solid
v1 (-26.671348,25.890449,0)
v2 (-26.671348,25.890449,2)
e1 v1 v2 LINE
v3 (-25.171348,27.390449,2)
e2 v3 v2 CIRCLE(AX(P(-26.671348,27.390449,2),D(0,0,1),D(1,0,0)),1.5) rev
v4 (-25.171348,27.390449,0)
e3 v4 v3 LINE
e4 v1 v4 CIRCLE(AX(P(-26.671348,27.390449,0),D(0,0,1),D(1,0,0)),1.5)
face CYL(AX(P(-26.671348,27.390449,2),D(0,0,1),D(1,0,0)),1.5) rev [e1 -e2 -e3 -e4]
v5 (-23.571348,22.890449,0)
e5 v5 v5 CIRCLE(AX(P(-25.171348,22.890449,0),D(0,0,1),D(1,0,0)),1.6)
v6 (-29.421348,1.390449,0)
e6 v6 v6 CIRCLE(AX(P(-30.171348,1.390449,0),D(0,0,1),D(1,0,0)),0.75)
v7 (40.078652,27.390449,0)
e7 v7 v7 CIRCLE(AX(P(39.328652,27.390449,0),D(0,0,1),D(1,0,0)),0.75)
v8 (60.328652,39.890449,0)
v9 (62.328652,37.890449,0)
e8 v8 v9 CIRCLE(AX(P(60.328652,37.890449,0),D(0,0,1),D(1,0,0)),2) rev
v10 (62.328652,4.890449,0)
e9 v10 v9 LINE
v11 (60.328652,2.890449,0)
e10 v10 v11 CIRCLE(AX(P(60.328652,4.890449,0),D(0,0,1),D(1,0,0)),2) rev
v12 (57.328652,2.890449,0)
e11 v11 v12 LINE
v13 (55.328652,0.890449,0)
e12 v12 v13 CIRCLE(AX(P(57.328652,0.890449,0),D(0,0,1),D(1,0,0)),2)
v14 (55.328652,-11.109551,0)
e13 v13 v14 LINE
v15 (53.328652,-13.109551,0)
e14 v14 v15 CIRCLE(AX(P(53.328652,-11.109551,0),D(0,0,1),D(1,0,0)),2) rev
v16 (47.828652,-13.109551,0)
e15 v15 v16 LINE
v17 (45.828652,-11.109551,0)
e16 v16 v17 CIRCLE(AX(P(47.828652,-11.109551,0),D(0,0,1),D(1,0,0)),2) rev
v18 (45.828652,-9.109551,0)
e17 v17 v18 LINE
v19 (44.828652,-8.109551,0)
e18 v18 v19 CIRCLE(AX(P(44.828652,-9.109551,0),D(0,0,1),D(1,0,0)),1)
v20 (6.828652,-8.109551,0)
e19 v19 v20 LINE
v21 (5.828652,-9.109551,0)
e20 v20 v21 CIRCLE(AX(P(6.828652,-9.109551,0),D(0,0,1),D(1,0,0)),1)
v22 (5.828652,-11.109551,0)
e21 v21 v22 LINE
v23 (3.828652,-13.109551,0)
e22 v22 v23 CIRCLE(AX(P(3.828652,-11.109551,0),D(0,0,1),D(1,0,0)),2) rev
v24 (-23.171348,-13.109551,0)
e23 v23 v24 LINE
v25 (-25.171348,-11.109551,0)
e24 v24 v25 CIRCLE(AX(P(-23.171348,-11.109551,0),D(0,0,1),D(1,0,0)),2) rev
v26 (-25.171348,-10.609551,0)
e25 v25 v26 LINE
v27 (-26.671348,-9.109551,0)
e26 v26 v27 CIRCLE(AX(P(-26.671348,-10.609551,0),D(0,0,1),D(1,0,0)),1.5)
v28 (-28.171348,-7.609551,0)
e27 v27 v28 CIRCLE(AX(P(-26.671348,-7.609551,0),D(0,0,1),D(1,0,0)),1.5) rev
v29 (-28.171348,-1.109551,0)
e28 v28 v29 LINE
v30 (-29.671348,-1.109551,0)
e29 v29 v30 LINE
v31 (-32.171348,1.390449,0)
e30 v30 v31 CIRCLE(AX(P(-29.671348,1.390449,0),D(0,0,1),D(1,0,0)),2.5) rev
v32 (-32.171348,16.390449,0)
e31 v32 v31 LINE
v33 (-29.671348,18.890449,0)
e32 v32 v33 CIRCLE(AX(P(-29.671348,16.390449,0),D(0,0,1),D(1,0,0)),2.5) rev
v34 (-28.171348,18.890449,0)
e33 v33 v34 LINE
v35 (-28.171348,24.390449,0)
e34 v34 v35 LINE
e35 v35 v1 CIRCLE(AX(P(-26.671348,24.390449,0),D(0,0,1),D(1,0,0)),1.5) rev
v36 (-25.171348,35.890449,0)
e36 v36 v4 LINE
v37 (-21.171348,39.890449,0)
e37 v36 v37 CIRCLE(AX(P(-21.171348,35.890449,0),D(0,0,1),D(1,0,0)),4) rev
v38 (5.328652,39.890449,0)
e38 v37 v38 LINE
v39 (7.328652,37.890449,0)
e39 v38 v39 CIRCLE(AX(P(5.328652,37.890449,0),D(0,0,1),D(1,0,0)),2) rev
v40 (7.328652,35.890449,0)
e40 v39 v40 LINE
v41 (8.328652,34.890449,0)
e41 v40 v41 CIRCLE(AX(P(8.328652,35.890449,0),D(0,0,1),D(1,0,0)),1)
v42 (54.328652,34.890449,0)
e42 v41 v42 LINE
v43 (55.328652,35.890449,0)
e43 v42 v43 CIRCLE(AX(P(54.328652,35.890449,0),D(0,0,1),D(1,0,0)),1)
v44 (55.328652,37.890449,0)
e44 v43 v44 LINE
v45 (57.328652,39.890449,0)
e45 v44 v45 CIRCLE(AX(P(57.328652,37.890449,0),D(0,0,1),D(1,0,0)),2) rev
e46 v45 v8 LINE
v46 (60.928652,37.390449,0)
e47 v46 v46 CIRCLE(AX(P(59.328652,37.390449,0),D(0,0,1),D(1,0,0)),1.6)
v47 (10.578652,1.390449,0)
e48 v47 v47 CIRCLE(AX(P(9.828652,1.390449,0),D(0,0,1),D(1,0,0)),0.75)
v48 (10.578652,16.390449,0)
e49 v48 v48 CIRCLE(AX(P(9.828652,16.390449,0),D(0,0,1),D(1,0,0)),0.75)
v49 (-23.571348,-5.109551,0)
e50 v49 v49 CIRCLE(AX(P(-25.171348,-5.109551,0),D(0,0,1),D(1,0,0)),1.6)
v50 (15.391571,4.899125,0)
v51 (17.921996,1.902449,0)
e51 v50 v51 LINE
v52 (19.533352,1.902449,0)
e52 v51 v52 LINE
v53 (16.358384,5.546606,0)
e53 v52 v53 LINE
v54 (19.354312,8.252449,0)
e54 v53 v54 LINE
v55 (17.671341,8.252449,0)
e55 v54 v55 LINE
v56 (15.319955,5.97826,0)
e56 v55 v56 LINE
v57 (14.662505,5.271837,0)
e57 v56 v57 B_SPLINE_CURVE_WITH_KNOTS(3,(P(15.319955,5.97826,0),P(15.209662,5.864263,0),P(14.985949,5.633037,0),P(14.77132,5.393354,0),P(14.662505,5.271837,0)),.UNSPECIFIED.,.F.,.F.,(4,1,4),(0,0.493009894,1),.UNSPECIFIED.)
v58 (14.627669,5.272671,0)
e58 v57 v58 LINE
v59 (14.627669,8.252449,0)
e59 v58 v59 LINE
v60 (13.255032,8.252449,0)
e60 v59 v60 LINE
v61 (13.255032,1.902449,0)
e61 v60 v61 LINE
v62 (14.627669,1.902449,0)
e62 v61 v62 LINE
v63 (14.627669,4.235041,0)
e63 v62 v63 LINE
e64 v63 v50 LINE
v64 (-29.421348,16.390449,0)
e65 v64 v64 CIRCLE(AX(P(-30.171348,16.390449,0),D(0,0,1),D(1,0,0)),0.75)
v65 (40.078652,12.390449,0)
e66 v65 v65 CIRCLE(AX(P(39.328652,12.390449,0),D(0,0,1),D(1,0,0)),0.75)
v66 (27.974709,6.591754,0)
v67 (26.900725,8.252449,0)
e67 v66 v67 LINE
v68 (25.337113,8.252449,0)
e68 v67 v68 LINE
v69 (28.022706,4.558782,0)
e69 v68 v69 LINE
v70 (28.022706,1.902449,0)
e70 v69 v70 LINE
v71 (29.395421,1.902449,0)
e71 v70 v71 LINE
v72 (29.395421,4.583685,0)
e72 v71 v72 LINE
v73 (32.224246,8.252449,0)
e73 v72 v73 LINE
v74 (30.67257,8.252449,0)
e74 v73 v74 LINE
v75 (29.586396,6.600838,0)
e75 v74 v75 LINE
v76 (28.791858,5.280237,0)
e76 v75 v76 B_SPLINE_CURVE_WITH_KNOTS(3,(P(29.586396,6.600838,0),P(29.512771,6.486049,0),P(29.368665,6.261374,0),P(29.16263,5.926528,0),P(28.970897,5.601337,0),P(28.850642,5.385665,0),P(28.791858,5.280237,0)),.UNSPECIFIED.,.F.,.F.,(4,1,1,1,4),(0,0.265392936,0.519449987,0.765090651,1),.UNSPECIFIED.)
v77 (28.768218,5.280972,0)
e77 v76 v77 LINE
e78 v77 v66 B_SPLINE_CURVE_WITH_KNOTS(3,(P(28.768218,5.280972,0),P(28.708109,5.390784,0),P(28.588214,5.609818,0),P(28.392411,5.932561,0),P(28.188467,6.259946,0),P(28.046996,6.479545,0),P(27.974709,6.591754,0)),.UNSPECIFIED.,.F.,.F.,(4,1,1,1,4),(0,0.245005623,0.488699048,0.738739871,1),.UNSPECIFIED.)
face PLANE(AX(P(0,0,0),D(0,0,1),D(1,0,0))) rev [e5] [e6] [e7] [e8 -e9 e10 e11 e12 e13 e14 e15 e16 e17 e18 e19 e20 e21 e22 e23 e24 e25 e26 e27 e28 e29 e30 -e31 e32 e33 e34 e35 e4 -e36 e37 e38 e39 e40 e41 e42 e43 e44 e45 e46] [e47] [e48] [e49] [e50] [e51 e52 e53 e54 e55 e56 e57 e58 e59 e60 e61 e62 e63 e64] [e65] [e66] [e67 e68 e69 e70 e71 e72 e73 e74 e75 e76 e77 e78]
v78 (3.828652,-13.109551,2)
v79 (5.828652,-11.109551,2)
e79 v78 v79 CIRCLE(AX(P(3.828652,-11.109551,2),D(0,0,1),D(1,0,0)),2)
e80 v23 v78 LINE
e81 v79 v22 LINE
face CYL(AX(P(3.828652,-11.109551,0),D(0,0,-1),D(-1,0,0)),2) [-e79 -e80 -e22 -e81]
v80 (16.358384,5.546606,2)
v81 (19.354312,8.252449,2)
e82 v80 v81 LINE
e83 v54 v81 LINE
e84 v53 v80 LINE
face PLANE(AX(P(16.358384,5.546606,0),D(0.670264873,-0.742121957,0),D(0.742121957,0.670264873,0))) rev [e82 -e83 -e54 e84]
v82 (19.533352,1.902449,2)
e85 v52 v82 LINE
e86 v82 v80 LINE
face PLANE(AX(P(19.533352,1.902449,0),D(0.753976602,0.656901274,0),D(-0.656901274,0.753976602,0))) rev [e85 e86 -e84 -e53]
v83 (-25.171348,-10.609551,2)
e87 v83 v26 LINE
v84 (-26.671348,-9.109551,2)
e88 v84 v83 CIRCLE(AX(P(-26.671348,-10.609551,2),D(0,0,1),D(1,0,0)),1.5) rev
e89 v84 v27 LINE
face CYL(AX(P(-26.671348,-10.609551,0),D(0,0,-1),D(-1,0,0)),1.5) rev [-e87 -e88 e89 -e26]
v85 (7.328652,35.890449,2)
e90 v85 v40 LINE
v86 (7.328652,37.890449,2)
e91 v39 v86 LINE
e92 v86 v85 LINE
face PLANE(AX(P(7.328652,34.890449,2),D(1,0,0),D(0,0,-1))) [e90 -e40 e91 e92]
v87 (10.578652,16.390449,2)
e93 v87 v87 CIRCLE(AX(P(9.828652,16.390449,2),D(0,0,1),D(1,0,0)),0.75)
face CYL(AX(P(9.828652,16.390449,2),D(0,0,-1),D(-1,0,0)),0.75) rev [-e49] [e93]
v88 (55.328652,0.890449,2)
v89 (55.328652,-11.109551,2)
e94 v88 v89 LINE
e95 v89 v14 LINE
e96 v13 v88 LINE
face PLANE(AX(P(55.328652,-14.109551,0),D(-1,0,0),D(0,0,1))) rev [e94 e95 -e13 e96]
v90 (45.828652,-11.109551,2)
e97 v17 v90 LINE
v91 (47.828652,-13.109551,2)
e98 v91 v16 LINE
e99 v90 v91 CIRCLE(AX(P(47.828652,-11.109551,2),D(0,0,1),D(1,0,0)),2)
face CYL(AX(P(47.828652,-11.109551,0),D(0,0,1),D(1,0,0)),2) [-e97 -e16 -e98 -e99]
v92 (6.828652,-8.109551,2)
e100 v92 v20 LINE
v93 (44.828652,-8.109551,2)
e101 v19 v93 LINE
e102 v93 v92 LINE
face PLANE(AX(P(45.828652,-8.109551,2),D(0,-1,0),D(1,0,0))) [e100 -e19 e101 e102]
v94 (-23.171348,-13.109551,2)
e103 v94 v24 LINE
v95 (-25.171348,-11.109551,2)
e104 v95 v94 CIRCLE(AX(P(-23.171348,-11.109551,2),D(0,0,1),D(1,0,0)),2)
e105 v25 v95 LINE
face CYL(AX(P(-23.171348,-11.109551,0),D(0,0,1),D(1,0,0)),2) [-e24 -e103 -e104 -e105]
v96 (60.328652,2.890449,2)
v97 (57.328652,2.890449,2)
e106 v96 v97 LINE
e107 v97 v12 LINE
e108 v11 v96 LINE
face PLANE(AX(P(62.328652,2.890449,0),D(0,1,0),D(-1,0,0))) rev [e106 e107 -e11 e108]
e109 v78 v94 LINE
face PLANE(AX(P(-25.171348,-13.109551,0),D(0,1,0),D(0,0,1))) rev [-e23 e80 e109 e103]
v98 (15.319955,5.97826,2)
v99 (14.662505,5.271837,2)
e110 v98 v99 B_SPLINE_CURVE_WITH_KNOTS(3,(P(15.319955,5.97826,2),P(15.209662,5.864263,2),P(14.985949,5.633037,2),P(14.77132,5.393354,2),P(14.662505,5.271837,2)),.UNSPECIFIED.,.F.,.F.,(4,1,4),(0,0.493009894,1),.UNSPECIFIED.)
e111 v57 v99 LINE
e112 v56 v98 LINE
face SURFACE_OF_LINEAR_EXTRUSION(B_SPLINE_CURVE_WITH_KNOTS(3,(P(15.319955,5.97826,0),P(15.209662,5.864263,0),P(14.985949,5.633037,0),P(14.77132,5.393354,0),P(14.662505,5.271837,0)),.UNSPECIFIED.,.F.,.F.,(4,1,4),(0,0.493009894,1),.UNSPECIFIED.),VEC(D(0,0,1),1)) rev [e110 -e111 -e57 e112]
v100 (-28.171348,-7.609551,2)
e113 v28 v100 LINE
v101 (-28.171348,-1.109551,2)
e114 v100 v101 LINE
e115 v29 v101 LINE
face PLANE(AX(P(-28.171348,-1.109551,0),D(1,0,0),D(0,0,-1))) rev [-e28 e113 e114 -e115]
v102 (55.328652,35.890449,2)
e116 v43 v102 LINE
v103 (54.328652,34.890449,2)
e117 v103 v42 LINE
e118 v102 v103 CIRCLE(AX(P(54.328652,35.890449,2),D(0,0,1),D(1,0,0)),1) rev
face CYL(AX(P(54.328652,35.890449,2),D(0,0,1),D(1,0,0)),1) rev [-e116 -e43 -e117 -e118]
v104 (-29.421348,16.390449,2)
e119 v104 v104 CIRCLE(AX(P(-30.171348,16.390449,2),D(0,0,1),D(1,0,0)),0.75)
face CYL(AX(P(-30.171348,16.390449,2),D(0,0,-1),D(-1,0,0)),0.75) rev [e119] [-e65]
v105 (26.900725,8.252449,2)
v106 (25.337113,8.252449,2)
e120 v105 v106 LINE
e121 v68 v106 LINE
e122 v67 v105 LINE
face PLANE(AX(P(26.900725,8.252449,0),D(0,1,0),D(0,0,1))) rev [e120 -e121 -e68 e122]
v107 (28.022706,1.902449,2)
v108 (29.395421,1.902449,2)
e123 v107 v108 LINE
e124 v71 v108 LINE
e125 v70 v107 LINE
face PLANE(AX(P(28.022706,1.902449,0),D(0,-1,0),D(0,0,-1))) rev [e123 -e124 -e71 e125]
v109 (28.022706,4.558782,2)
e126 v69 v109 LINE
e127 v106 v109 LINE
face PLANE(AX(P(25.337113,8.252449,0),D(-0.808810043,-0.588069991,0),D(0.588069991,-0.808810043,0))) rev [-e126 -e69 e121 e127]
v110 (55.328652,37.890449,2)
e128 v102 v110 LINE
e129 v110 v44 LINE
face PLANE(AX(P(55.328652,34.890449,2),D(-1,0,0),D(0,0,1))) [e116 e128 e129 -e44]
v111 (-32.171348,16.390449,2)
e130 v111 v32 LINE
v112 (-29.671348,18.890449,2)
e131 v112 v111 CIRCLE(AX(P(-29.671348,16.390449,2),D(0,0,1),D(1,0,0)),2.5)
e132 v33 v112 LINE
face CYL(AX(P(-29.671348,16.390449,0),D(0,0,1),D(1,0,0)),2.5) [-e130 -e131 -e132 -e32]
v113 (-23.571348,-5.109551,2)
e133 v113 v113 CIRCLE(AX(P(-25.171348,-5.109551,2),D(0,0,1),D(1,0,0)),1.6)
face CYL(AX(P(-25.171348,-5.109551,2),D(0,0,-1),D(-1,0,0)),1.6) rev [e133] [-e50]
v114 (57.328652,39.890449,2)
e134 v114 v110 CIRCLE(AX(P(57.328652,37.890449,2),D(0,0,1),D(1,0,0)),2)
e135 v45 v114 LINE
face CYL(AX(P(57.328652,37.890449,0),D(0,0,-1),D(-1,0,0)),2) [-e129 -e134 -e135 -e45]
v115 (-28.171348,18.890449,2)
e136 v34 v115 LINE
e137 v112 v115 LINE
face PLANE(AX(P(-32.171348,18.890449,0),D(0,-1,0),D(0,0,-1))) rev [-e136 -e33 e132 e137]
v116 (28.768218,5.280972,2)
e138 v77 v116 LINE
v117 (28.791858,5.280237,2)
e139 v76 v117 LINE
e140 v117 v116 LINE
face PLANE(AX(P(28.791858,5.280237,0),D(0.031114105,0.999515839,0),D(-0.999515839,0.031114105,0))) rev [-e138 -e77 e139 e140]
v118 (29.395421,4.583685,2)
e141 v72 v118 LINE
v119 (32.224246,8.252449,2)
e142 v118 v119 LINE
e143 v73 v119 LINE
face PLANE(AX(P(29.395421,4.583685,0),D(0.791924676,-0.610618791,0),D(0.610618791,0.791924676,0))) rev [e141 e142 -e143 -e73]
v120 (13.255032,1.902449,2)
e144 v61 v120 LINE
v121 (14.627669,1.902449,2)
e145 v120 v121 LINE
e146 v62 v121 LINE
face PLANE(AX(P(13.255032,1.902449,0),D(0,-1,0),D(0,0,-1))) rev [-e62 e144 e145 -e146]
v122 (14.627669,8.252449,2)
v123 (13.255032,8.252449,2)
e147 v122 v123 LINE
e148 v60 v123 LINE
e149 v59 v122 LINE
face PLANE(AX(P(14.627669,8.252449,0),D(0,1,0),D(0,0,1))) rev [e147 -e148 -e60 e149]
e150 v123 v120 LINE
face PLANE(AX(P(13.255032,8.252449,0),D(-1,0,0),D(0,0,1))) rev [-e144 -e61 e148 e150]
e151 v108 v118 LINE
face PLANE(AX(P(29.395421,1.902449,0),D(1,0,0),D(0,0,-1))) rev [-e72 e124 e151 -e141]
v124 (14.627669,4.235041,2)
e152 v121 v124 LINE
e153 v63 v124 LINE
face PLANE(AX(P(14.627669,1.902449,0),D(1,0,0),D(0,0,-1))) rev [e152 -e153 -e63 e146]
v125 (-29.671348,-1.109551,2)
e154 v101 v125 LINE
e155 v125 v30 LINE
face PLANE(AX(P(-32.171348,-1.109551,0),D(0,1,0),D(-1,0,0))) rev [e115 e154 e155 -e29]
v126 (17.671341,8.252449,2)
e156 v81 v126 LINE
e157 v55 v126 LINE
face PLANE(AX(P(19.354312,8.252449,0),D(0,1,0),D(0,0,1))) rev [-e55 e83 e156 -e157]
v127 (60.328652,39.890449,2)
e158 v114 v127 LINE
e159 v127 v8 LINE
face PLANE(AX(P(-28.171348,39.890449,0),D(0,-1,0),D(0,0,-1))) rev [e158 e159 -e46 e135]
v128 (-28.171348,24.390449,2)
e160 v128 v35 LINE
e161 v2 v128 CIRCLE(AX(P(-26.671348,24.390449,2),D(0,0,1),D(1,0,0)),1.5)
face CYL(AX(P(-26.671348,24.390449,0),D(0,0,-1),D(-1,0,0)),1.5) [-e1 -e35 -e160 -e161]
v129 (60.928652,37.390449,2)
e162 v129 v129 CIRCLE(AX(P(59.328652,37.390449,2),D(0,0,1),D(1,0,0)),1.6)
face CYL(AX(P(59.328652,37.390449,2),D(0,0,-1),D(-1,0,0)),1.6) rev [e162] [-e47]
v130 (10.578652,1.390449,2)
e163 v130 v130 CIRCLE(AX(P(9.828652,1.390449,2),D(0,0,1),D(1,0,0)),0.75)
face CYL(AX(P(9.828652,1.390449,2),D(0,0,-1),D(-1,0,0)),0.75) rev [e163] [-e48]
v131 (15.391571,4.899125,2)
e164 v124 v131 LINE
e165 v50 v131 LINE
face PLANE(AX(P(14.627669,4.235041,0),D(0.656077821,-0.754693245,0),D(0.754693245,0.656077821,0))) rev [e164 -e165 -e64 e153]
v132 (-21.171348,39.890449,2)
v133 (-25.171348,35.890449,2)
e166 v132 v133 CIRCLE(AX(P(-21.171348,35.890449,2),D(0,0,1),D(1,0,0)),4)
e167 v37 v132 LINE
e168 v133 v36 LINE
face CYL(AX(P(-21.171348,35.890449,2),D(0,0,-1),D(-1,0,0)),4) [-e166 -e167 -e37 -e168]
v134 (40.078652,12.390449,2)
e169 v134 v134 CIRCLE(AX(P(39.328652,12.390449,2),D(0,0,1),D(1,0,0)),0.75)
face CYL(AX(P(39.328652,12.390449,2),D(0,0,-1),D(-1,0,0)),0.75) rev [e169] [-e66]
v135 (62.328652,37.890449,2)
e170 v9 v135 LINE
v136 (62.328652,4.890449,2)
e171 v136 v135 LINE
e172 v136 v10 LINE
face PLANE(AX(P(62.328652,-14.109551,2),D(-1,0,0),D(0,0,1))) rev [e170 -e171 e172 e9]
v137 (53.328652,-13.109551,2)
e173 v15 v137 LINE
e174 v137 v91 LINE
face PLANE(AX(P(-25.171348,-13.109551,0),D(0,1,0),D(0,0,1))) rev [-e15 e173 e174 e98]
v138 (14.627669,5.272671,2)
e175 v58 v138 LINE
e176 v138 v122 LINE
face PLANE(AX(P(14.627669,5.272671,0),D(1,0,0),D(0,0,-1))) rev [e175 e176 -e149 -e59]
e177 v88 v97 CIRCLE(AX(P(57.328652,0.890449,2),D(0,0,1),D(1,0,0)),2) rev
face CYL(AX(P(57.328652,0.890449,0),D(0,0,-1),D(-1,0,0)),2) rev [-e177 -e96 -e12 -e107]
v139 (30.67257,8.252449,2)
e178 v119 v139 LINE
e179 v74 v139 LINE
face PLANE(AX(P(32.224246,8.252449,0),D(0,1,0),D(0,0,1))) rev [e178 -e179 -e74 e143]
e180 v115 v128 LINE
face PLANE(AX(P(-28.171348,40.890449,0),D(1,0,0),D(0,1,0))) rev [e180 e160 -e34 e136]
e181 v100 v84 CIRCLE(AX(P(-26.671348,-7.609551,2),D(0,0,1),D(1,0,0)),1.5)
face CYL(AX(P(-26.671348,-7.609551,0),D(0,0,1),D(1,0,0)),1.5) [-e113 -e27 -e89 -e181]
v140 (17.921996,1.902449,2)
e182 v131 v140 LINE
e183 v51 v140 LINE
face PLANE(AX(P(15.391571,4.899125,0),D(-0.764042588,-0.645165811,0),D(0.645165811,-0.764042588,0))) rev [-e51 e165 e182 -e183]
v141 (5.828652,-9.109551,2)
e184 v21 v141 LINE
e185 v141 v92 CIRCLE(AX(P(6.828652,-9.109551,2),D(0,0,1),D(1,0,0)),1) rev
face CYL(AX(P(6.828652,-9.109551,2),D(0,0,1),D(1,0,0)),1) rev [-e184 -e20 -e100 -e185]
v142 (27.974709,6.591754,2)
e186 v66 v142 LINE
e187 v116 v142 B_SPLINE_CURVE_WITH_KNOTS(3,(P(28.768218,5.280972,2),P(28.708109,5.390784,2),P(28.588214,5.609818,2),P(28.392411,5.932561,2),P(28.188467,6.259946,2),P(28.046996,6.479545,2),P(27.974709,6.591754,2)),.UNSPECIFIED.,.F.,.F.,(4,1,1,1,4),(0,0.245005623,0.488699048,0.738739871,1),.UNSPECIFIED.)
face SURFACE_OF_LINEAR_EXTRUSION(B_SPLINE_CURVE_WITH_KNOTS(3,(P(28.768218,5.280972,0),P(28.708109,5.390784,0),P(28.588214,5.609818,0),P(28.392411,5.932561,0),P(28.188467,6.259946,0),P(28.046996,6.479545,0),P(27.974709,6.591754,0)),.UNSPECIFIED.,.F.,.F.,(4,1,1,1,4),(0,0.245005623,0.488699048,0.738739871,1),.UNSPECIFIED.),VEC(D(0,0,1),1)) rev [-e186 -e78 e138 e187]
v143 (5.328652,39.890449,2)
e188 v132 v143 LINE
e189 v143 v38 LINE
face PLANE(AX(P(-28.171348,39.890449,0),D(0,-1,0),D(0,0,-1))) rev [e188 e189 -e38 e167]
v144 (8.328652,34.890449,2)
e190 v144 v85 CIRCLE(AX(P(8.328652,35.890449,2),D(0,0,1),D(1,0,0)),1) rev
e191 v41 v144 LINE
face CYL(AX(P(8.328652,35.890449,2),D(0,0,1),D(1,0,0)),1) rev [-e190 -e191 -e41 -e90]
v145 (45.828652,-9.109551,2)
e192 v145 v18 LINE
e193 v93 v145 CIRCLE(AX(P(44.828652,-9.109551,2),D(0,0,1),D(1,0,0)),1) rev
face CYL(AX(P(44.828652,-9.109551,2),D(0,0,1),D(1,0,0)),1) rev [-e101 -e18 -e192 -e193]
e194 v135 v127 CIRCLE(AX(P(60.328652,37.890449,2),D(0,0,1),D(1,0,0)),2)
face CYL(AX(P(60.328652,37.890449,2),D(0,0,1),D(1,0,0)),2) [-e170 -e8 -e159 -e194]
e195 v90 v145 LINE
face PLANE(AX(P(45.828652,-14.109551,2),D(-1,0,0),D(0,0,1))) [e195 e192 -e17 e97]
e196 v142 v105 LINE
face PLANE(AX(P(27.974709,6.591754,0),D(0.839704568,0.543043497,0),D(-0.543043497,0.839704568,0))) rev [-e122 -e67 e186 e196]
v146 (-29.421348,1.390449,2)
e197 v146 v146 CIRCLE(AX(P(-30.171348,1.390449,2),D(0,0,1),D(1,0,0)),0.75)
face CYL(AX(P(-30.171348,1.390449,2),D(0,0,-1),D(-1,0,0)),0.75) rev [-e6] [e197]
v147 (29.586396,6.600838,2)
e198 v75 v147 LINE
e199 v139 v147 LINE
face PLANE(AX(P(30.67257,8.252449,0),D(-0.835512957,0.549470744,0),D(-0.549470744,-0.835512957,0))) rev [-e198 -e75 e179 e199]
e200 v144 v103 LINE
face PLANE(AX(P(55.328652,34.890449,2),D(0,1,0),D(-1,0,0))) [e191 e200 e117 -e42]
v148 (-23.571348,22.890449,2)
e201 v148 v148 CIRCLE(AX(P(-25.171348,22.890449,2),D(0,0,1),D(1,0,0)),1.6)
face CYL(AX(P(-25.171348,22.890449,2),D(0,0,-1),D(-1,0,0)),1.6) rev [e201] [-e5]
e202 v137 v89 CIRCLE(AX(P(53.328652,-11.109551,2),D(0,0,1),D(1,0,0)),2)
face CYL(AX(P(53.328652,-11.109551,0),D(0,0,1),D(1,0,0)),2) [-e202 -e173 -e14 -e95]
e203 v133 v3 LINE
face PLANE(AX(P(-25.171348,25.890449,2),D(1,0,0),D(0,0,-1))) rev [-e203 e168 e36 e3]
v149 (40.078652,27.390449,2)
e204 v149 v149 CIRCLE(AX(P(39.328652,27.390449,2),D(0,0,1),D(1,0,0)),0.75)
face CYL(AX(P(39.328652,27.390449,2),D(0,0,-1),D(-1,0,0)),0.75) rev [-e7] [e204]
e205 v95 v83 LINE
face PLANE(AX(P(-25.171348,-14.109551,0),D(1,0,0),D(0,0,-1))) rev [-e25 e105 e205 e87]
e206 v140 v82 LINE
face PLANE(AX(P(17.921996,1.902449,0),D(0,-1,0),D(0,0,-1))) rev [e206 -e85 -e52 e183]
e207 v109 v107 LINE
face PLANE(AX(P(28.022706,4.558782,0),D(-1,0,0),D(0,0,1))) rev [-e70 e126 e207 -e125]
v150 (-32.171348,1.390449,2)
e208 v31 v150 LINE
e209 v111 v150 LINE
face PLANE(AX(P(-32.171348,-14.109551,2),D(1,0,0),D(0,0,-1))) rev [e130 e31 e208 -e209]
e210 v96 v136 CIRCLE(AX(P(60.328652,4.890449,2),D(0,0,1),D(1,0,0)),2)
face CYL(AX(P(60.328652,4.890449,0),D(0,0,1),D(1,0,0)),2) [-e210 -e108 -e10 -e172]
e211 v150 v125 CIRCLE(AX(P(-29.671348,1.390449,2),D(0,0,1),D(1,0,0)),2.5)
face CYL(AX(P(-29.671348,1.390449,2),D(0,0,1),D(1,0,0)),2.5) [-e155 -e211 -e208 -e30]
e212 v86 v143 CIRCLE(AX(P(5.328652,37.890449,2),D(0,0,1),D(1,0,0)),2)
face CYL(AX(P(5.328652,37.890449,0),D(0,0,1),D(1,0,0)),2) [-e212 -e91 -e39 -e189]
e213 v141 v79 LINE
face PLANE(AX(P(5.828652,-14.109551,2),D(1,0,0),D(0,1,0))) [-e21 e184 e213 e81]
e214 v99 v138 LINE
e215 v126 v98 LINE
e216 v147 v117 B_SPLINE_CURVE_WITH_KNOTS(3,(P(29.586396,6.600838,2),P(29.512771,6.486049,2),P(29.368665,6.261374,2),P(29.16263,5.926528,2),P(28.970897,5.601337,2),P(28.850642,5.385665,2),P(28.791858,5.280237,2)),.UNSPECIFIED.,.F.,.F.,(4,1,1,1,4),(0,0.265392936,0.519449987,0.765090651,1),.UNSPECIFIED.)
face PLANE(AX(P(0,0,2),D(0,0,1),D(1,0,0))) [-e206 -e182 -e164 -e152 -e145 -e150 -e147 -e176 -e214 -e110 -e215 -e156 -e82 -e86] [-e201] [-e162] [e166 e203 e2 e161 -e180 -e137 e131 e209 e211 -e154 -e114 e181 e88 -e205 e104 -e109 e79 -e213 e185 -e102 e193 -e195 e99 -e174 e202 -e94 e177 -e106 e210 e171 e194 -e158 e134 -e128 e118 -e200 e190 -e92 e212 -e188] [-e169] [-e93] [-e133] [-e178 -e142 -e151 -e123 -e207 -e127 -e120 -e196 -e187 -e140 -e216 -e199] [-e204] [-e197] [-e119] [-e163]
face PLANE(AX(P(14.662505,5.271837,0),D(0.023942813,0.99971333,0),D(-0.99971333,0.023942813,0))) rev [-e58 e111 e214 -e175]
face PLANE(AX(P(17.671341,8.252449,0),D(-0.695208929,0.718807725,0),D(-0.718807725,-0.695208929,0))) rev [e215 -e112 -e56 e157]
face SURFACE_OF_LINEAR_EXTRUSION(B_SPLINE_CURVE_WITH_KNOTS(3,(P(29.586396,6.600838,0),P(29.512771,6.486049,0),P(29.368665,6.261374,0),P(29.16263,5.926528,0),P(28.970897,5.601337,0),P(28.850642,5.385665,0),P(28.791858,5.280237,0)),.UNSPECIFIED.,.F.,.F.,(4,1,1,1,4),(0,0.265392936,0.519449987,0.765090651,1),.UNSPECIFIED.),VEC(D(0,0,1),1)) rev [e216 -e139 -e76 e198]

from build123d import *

# Parameters (mm, degrees)
SKETCH_6_W          = 94.5
SKETCH_6_H          = 55
EXTRUDE_1_DEPTH     = 2
SKETCH_772_W        = 40
SKETCH_772_H        = 6
SKETCH_772_W_2      = 48
CUT_EXTRUDE_1_DEPTH = 75.571373034
JOY_R               = 1.6
CUT_EXTRUDE_2_DEPTH = 75.571373034
NANO_R              = 0.75
CUT_EXTRUDE_4_DEPTH = 75.571373034
SKETCH_648_R        = 0.75
CUT_EXTRUDE_5_DEPTH = 75.571373034
SKETCH_7_W          = 7
SKETCH_7_H          = 17
SKETCH_7_W_2        = 4
SKETCH_7_H_2        = 22
CUT_EXTRUDE_6_DEPTH = 75.571373034
CUT_EXTRUDE_7_DEPTH = 75.571373034
SKETCH_10_W         = 90.5
SKETCH_10_H         = 1
SKETCH_10_W_2       = 80.5
CUT_EXTRUDE_8_DEPTH = 75.571373175
FILLET_3_R          = 1
FILLET_START        = -1
FILLET_4_DEPTH      = 4
FILLET_4_2_DEPTH    = 2
FILLET_5_R          = 2
FILLET_6_R          = 2.5
SKETCH_11_W         = 3
SKETCH_11_H         = 14
CUT_EXTRUDE_9_DEPTH = 75.027756944
FILLET_7_R          = 1.5
FILLET_8_R          = 4


with BuildPart() as part:
    # 草图6 → 凸台-拉伸1 (new body)
    with BuildSketch(Plane.XY):
        with Locations((15.078651685, 13.390449438)):
            Rectangle(SKETCH_6_W, SKETCH_6_H)
    extrude(amount=EXTRUDE_1_DEPTH)

    # Sketch 772 → 切除-拉伸1 (cut, through all)
    with BuildSketch(Plane.XY):
        with Locations((25.828651685, -11.109550562)):
            Rectangle(SKETCH_772_W, SKETCH_772_H)
        with Locations((31.328651685, 37.890449438)):
            Rectangle(SKETCH_772_W_2, SKETCH_772_H)
    extrude(amount=CUT_EXTRUDE_1_DEPTH, mode=Mode.SUBTRACT)

    # Joy → 切除-拉伸2 (cut, through all)
    with BuildSketch(Plane.XY):
        with Locations((-25.171348315, 22.890449438)):
            Circle(JOY_R)
        with Locations((59.328651685, 37.390449438)):
            Circle(JOY_R)
        with Locations((-25.171348315, -5.109550562)):
            Circle(JOY_R)
    extrude(amount=CUT_EXTRUDE_2_DEPTH, mode=Mode.SUBTRACT)

    # Nano → 切除-拉伸4 (cut, through all)
    with BuildSketch(Plane.XY):
        with Locations((-30.171348315, 16.390449438)):
            Circle(NANO_R)
        with Locations((9.828651685, 1.390449438)):
            Circle(NANO_R)
        with Locations((-30.171348315, 1.390449438)):
            Circle(NANO_R)
        with Locations((9.828651685, 16.390449438)):
            Circle(NANO_R)
    extrude(amount=CUT_EXTRUDE_4_DEPTH, mode=Mode.SUBTRACT)

    # Sketch 648 → 切除-拉伸5 (cut, through all)
    with BuildSketch(Plane.XY):
        with Locations((39.328651685, 12.390449438)):
            Circle(SKETCH_648_R)
        with Locations((39.328651685, 27.390449438)):
            Circle(SKETCH_648_R)
    extrude(amount=CUT_EXTRUDE_5_DEPTH, mode=Mode.SUBTRACT)

    # 草图7 → 切除-拉伸6 (cut, through all)
    with BuildSketch(Plane.XY.offset(2)):
        with Locations((58.828651685, -5.609550562)):
            Rectangle(SKETCH_7_W, SKETCH_7_H)
        Polygon((-32.171348315, -14.109550562), (-25.171348315, -14.109550562), (-25.171348315, -9.109550562), (-28.171348315, -9.109550562), (-28.171348315, -1.109550562), (-32.171348315, -1.109550562), (-32.171348315, -10.609550562), align=None)
        with Locations((-30.171348315, 29.890449438)):
            Rectangle(SKETCH_7_W_2, SKETCH_7_H_2)
    extrude(amount=-CUT_EXTRUDE_6_DEPTH, mode=Mode.SUBTRACT)

    # 草图9 → 切除-拉伸7 (cut, through all)
    with BuildSketch(Plane.XY.offset(2)):
        with BuildLine():
            Line((16.358384135, 5.546605741), (19.354312374, 8.252448685))
            Line((19.354312374, 8.252448685), (17.671340733, 8.252448685))
            Line((17.671340733, 8.252448685), (15.319954825, 5.97825988))
            add(Edge.make_bspline(
                [(15.319954825, 5.97825988), (15.209662045, 5.864263234), (14.985948929, 5.633037354), (14.771319897, 5.3933541), (14.662505102, 5.271837061)],
                knots=[0, 0, 0, 0, 0.986019789, 2, 2, 2, 2], degree=3))
            Line((14.662505102, 5.271837061), (14.627668618, 5.272671384))
            Line((14.627668618, 5.272671384), (14.627668618, 8.252448685))
            Line((14.627668618, 8.252448685), (13.255032174, 8.252448685))
            Line((13.255032174, 8.252448685), (13.255032174, 1.902448685))
            Line((13.255032174, 1.902448685), (14.627668618, 1.902448685))
            Line((14.627668618, 1.902448685), (14.627668618, 4.235041243))
            Line((14.627668618, 4.235041243), (15.391570639, 4.899124533))
            Line((15.391570639, 4.899124533), (17.921996084, 1.902448685))
            Line((17.921996084, 1.902448685), (19.53335191, 1.902448685))
            Line((19.53335191, 1.902448685), (16.358384135, 5.546605741))
        make_face()
        with BuildLine():
            Line((30.672569626, 8.252448685), (29.58639644, 6.600837965))
            add(Edge.make_bspline(
                [(29.58639644, 6.600837965), (29.512770867, 6.486048967), (29.368664533, 6.261374021), (29.16262961, 5.926527835), (28.970896691, 5.601336831), (28.850642197, 5.385664551), (28.791857671, 5.280236534)],
                knots=[0, 0, 0, 0, 1.061571746, 2.077799947, 3.060362604, 4, 4, 4, 4], degree=3))
            Line((28.791857671, 5.280236534), (28.76821775, 5.280972425))
            add(Edge.make_bspline(
                [(28.76821775, 5.280972425), (28.708109277, 5.390783537), (28.58821426, 5.609817636), (28.392410779, 5.93256056), (28.188467145, 6.25994594), (28.046996459, 6.479545222), (27.974708994, 6.591754161)],
                knots=[0, 0, 0, 0, 0.980022492, 1.954796193, 2.954959484, 4, 4, 4, 4], degree=3))
            Line((27.974708994, 6.591754161), (26.900724886, 8.252448685))
            Line((26.900724886, 8.252448685), (25.337112937, 8.252448685))
            Line((25.337112937, 8.252448685), (28.02270598, 4.558781847))
            Line((28.02270598, 4.558781847), (28.02270598, 1.902448685))
            Line((28.02270598, 1.902448685), (29.395420935, 1.902448685))
            Line((29.395420935, 1.902448685), (29.395420935, 4.58368497))
            Line((29.395420935, 4.58368497), (32.224245607, 8.252448685))
            Line((32.224245607, 8.252448685), (30.672569626, 8.252448685))
        make_face()
    extrude(amount=-CUT_EXTRUDE_7_DEPTH, mode=Mode.SUBTRACT)

    # 草图10 → 切除-拉伸8 (cut, through all)
    with BuildSketch(Plane.XY.offset(2)):
        with Locations((17.078651685, 40.390449438)):
            Rectangle(SKETCH_10_W, SKETCH_10_H)
        with Locations((15.078651685, -13.609550562)):
            Rectangle(SKETCH_10_W_2, SKETCH_10_H)
    extrude(amount=-CUT_EXTRUDE_8_DEPTH, mode=Mode.SUBTRACT)

    # 圆角3
    fillet_3_edges = [part.edges().sort_by_distance(p)[0] for p in [
        (45.828651685, -8.109550562, 1),
        (5.828651685, -8.109550562, 1),
        (55.328651685, 34.890449438, 1),
        (7.328651685, 34.890449438, 1),
    ]]
    fillet(fillet_3_edges, radius=FILLET_3_R)

    # 圆角4: read off the stored shape, not the designer's step
    # 圆角4 outline → 圆角4 (cut)
    with BuildSketch(Plane.XY.offset(FILLET_START)):
        with BuildLine():
            ThreePointArc((-26.671348315, -9.109550562), (-27.732008486, -8.670210734), (-28.171348315, -7.609550562))
            Line((-28.171348315, -7.609550562), (-28.171348315, -9.109550562))
            Line((-28.171348315, -9.109550562), (-26.671348315, -9.109550562))
        make_face()
    extrude(amount=FILLET_4_DEPTH, mode=Mode.SUBTRACT)

    # Fillet 4 2 outline → Fillet 4 2 (add)
    with BuildSketch(Plane.XY):
        with BuildLine():
            Line((-25.171348315, -9.109550562), (-26.671348315, -9.109550562))
            ThreePointArc((-26.671348315, -9.109550562), (-25.610688143, -9.54889039), (-25.171348315, -10.609550562))
            Line((-25.171348315, -10.609550562), (-25.171348315, -9.109550562))
        make_face()
    extrude(amount=FILLET_4_2_DEPTH)

    # 圆角5
    fillet_5_edges = [part.edges().sort_by_distance(p)[0] for p in [
        (55.328651685, 2.890449438, 1),
        (55.328651685, 39.890449438, 1),
        (7.328651685, 39.890449438, 1),
        (62.328651685, 39.890449438, 1),
        (45.828651685, -13.109550562, 1),
        (5.828651685, -13.109550562, 1),
        (-25.171348315, -13.109550562, 1),
        (55.328651685, -13.109550562, 1),
        (62.328651685, 2.890449438, 1),
    ]]
    fillet(fillet_5_edges, radius=FILLET_5_R)

    # 圆角6
    fillet_6_edges = [part.edges().sort_by_distance(p)[0] for p in [
        (-32.171348315, -1.109550562, 1),
        (-32.171348315, 18.890449438, 1),
    ]]
    fillet(fillet_6_edges, radius=FILLET_6_R)

    # 草图11 → 切除-拉伸9 (cut, through all)
    with BuildSketch(Plane(origin=(0, 0, 0), x_dir=(-1, 0, 0), z_dir=(0, 0, -1))):
        with Locations((26.671348315, 32.890449438)):
            Rectangle(SKETCH_11_W, SKETCH_11_H)
    extrude(amount=-CUT_EXTRUDE_9_DEPTH, mode=Mode.SUBTRACT)

    # 圆角7
    # the kernel refuses this fillet: 1.5 mm, written as the material it adds along each edge
    with BuildSketch(Plane(origin=(-25.171348315, 25.890449438, 0), x_dir=(0, 1, 0), z_dir=(0, 0, 1))) as fillet_7_piece_1:
        with BuildLine():
            CenterArc((FILLET_7_R, FILLET_7_R), FILLET_7_R, 180, 90)
            Line((0, FILLET_7_R), (0, 0))
            Line((0, 0), (FILLET_7_R, 0))
        make_face()
    extrude(amount=2)
    # the kernel refuses this fillet: 1.5 mm, written as the material it takes off along each edge
    with BuildSketch(Plane(origin=(-28.171348315, 25.890449438, -3.75), x_dir=(1, 0, 0), z_dir=(0, 0, 1))) as fillet_7_2_piece_1:
        with BuildLine():
            CenterArc((FILLET_7_R, -FILLET_7_R), FILLET_7_R, 90, 90)
            Line((0, -FILLET_7_R), (0, 0))
            Line((0, 0), (FILLET_7_R, 0))
        make_face()
    extrude(amount=9.5, mode=Mode.SUBTRACT)

    # 圆角8
    fillet_8_edges = [part.edges().sort_by_distance(p)[0] for p in [
        (-25.171348315, 39.890449438, 1),
    ]]
    fillet(fillet_8_edges, radius=FILLET_8_R)


solid = part.part
